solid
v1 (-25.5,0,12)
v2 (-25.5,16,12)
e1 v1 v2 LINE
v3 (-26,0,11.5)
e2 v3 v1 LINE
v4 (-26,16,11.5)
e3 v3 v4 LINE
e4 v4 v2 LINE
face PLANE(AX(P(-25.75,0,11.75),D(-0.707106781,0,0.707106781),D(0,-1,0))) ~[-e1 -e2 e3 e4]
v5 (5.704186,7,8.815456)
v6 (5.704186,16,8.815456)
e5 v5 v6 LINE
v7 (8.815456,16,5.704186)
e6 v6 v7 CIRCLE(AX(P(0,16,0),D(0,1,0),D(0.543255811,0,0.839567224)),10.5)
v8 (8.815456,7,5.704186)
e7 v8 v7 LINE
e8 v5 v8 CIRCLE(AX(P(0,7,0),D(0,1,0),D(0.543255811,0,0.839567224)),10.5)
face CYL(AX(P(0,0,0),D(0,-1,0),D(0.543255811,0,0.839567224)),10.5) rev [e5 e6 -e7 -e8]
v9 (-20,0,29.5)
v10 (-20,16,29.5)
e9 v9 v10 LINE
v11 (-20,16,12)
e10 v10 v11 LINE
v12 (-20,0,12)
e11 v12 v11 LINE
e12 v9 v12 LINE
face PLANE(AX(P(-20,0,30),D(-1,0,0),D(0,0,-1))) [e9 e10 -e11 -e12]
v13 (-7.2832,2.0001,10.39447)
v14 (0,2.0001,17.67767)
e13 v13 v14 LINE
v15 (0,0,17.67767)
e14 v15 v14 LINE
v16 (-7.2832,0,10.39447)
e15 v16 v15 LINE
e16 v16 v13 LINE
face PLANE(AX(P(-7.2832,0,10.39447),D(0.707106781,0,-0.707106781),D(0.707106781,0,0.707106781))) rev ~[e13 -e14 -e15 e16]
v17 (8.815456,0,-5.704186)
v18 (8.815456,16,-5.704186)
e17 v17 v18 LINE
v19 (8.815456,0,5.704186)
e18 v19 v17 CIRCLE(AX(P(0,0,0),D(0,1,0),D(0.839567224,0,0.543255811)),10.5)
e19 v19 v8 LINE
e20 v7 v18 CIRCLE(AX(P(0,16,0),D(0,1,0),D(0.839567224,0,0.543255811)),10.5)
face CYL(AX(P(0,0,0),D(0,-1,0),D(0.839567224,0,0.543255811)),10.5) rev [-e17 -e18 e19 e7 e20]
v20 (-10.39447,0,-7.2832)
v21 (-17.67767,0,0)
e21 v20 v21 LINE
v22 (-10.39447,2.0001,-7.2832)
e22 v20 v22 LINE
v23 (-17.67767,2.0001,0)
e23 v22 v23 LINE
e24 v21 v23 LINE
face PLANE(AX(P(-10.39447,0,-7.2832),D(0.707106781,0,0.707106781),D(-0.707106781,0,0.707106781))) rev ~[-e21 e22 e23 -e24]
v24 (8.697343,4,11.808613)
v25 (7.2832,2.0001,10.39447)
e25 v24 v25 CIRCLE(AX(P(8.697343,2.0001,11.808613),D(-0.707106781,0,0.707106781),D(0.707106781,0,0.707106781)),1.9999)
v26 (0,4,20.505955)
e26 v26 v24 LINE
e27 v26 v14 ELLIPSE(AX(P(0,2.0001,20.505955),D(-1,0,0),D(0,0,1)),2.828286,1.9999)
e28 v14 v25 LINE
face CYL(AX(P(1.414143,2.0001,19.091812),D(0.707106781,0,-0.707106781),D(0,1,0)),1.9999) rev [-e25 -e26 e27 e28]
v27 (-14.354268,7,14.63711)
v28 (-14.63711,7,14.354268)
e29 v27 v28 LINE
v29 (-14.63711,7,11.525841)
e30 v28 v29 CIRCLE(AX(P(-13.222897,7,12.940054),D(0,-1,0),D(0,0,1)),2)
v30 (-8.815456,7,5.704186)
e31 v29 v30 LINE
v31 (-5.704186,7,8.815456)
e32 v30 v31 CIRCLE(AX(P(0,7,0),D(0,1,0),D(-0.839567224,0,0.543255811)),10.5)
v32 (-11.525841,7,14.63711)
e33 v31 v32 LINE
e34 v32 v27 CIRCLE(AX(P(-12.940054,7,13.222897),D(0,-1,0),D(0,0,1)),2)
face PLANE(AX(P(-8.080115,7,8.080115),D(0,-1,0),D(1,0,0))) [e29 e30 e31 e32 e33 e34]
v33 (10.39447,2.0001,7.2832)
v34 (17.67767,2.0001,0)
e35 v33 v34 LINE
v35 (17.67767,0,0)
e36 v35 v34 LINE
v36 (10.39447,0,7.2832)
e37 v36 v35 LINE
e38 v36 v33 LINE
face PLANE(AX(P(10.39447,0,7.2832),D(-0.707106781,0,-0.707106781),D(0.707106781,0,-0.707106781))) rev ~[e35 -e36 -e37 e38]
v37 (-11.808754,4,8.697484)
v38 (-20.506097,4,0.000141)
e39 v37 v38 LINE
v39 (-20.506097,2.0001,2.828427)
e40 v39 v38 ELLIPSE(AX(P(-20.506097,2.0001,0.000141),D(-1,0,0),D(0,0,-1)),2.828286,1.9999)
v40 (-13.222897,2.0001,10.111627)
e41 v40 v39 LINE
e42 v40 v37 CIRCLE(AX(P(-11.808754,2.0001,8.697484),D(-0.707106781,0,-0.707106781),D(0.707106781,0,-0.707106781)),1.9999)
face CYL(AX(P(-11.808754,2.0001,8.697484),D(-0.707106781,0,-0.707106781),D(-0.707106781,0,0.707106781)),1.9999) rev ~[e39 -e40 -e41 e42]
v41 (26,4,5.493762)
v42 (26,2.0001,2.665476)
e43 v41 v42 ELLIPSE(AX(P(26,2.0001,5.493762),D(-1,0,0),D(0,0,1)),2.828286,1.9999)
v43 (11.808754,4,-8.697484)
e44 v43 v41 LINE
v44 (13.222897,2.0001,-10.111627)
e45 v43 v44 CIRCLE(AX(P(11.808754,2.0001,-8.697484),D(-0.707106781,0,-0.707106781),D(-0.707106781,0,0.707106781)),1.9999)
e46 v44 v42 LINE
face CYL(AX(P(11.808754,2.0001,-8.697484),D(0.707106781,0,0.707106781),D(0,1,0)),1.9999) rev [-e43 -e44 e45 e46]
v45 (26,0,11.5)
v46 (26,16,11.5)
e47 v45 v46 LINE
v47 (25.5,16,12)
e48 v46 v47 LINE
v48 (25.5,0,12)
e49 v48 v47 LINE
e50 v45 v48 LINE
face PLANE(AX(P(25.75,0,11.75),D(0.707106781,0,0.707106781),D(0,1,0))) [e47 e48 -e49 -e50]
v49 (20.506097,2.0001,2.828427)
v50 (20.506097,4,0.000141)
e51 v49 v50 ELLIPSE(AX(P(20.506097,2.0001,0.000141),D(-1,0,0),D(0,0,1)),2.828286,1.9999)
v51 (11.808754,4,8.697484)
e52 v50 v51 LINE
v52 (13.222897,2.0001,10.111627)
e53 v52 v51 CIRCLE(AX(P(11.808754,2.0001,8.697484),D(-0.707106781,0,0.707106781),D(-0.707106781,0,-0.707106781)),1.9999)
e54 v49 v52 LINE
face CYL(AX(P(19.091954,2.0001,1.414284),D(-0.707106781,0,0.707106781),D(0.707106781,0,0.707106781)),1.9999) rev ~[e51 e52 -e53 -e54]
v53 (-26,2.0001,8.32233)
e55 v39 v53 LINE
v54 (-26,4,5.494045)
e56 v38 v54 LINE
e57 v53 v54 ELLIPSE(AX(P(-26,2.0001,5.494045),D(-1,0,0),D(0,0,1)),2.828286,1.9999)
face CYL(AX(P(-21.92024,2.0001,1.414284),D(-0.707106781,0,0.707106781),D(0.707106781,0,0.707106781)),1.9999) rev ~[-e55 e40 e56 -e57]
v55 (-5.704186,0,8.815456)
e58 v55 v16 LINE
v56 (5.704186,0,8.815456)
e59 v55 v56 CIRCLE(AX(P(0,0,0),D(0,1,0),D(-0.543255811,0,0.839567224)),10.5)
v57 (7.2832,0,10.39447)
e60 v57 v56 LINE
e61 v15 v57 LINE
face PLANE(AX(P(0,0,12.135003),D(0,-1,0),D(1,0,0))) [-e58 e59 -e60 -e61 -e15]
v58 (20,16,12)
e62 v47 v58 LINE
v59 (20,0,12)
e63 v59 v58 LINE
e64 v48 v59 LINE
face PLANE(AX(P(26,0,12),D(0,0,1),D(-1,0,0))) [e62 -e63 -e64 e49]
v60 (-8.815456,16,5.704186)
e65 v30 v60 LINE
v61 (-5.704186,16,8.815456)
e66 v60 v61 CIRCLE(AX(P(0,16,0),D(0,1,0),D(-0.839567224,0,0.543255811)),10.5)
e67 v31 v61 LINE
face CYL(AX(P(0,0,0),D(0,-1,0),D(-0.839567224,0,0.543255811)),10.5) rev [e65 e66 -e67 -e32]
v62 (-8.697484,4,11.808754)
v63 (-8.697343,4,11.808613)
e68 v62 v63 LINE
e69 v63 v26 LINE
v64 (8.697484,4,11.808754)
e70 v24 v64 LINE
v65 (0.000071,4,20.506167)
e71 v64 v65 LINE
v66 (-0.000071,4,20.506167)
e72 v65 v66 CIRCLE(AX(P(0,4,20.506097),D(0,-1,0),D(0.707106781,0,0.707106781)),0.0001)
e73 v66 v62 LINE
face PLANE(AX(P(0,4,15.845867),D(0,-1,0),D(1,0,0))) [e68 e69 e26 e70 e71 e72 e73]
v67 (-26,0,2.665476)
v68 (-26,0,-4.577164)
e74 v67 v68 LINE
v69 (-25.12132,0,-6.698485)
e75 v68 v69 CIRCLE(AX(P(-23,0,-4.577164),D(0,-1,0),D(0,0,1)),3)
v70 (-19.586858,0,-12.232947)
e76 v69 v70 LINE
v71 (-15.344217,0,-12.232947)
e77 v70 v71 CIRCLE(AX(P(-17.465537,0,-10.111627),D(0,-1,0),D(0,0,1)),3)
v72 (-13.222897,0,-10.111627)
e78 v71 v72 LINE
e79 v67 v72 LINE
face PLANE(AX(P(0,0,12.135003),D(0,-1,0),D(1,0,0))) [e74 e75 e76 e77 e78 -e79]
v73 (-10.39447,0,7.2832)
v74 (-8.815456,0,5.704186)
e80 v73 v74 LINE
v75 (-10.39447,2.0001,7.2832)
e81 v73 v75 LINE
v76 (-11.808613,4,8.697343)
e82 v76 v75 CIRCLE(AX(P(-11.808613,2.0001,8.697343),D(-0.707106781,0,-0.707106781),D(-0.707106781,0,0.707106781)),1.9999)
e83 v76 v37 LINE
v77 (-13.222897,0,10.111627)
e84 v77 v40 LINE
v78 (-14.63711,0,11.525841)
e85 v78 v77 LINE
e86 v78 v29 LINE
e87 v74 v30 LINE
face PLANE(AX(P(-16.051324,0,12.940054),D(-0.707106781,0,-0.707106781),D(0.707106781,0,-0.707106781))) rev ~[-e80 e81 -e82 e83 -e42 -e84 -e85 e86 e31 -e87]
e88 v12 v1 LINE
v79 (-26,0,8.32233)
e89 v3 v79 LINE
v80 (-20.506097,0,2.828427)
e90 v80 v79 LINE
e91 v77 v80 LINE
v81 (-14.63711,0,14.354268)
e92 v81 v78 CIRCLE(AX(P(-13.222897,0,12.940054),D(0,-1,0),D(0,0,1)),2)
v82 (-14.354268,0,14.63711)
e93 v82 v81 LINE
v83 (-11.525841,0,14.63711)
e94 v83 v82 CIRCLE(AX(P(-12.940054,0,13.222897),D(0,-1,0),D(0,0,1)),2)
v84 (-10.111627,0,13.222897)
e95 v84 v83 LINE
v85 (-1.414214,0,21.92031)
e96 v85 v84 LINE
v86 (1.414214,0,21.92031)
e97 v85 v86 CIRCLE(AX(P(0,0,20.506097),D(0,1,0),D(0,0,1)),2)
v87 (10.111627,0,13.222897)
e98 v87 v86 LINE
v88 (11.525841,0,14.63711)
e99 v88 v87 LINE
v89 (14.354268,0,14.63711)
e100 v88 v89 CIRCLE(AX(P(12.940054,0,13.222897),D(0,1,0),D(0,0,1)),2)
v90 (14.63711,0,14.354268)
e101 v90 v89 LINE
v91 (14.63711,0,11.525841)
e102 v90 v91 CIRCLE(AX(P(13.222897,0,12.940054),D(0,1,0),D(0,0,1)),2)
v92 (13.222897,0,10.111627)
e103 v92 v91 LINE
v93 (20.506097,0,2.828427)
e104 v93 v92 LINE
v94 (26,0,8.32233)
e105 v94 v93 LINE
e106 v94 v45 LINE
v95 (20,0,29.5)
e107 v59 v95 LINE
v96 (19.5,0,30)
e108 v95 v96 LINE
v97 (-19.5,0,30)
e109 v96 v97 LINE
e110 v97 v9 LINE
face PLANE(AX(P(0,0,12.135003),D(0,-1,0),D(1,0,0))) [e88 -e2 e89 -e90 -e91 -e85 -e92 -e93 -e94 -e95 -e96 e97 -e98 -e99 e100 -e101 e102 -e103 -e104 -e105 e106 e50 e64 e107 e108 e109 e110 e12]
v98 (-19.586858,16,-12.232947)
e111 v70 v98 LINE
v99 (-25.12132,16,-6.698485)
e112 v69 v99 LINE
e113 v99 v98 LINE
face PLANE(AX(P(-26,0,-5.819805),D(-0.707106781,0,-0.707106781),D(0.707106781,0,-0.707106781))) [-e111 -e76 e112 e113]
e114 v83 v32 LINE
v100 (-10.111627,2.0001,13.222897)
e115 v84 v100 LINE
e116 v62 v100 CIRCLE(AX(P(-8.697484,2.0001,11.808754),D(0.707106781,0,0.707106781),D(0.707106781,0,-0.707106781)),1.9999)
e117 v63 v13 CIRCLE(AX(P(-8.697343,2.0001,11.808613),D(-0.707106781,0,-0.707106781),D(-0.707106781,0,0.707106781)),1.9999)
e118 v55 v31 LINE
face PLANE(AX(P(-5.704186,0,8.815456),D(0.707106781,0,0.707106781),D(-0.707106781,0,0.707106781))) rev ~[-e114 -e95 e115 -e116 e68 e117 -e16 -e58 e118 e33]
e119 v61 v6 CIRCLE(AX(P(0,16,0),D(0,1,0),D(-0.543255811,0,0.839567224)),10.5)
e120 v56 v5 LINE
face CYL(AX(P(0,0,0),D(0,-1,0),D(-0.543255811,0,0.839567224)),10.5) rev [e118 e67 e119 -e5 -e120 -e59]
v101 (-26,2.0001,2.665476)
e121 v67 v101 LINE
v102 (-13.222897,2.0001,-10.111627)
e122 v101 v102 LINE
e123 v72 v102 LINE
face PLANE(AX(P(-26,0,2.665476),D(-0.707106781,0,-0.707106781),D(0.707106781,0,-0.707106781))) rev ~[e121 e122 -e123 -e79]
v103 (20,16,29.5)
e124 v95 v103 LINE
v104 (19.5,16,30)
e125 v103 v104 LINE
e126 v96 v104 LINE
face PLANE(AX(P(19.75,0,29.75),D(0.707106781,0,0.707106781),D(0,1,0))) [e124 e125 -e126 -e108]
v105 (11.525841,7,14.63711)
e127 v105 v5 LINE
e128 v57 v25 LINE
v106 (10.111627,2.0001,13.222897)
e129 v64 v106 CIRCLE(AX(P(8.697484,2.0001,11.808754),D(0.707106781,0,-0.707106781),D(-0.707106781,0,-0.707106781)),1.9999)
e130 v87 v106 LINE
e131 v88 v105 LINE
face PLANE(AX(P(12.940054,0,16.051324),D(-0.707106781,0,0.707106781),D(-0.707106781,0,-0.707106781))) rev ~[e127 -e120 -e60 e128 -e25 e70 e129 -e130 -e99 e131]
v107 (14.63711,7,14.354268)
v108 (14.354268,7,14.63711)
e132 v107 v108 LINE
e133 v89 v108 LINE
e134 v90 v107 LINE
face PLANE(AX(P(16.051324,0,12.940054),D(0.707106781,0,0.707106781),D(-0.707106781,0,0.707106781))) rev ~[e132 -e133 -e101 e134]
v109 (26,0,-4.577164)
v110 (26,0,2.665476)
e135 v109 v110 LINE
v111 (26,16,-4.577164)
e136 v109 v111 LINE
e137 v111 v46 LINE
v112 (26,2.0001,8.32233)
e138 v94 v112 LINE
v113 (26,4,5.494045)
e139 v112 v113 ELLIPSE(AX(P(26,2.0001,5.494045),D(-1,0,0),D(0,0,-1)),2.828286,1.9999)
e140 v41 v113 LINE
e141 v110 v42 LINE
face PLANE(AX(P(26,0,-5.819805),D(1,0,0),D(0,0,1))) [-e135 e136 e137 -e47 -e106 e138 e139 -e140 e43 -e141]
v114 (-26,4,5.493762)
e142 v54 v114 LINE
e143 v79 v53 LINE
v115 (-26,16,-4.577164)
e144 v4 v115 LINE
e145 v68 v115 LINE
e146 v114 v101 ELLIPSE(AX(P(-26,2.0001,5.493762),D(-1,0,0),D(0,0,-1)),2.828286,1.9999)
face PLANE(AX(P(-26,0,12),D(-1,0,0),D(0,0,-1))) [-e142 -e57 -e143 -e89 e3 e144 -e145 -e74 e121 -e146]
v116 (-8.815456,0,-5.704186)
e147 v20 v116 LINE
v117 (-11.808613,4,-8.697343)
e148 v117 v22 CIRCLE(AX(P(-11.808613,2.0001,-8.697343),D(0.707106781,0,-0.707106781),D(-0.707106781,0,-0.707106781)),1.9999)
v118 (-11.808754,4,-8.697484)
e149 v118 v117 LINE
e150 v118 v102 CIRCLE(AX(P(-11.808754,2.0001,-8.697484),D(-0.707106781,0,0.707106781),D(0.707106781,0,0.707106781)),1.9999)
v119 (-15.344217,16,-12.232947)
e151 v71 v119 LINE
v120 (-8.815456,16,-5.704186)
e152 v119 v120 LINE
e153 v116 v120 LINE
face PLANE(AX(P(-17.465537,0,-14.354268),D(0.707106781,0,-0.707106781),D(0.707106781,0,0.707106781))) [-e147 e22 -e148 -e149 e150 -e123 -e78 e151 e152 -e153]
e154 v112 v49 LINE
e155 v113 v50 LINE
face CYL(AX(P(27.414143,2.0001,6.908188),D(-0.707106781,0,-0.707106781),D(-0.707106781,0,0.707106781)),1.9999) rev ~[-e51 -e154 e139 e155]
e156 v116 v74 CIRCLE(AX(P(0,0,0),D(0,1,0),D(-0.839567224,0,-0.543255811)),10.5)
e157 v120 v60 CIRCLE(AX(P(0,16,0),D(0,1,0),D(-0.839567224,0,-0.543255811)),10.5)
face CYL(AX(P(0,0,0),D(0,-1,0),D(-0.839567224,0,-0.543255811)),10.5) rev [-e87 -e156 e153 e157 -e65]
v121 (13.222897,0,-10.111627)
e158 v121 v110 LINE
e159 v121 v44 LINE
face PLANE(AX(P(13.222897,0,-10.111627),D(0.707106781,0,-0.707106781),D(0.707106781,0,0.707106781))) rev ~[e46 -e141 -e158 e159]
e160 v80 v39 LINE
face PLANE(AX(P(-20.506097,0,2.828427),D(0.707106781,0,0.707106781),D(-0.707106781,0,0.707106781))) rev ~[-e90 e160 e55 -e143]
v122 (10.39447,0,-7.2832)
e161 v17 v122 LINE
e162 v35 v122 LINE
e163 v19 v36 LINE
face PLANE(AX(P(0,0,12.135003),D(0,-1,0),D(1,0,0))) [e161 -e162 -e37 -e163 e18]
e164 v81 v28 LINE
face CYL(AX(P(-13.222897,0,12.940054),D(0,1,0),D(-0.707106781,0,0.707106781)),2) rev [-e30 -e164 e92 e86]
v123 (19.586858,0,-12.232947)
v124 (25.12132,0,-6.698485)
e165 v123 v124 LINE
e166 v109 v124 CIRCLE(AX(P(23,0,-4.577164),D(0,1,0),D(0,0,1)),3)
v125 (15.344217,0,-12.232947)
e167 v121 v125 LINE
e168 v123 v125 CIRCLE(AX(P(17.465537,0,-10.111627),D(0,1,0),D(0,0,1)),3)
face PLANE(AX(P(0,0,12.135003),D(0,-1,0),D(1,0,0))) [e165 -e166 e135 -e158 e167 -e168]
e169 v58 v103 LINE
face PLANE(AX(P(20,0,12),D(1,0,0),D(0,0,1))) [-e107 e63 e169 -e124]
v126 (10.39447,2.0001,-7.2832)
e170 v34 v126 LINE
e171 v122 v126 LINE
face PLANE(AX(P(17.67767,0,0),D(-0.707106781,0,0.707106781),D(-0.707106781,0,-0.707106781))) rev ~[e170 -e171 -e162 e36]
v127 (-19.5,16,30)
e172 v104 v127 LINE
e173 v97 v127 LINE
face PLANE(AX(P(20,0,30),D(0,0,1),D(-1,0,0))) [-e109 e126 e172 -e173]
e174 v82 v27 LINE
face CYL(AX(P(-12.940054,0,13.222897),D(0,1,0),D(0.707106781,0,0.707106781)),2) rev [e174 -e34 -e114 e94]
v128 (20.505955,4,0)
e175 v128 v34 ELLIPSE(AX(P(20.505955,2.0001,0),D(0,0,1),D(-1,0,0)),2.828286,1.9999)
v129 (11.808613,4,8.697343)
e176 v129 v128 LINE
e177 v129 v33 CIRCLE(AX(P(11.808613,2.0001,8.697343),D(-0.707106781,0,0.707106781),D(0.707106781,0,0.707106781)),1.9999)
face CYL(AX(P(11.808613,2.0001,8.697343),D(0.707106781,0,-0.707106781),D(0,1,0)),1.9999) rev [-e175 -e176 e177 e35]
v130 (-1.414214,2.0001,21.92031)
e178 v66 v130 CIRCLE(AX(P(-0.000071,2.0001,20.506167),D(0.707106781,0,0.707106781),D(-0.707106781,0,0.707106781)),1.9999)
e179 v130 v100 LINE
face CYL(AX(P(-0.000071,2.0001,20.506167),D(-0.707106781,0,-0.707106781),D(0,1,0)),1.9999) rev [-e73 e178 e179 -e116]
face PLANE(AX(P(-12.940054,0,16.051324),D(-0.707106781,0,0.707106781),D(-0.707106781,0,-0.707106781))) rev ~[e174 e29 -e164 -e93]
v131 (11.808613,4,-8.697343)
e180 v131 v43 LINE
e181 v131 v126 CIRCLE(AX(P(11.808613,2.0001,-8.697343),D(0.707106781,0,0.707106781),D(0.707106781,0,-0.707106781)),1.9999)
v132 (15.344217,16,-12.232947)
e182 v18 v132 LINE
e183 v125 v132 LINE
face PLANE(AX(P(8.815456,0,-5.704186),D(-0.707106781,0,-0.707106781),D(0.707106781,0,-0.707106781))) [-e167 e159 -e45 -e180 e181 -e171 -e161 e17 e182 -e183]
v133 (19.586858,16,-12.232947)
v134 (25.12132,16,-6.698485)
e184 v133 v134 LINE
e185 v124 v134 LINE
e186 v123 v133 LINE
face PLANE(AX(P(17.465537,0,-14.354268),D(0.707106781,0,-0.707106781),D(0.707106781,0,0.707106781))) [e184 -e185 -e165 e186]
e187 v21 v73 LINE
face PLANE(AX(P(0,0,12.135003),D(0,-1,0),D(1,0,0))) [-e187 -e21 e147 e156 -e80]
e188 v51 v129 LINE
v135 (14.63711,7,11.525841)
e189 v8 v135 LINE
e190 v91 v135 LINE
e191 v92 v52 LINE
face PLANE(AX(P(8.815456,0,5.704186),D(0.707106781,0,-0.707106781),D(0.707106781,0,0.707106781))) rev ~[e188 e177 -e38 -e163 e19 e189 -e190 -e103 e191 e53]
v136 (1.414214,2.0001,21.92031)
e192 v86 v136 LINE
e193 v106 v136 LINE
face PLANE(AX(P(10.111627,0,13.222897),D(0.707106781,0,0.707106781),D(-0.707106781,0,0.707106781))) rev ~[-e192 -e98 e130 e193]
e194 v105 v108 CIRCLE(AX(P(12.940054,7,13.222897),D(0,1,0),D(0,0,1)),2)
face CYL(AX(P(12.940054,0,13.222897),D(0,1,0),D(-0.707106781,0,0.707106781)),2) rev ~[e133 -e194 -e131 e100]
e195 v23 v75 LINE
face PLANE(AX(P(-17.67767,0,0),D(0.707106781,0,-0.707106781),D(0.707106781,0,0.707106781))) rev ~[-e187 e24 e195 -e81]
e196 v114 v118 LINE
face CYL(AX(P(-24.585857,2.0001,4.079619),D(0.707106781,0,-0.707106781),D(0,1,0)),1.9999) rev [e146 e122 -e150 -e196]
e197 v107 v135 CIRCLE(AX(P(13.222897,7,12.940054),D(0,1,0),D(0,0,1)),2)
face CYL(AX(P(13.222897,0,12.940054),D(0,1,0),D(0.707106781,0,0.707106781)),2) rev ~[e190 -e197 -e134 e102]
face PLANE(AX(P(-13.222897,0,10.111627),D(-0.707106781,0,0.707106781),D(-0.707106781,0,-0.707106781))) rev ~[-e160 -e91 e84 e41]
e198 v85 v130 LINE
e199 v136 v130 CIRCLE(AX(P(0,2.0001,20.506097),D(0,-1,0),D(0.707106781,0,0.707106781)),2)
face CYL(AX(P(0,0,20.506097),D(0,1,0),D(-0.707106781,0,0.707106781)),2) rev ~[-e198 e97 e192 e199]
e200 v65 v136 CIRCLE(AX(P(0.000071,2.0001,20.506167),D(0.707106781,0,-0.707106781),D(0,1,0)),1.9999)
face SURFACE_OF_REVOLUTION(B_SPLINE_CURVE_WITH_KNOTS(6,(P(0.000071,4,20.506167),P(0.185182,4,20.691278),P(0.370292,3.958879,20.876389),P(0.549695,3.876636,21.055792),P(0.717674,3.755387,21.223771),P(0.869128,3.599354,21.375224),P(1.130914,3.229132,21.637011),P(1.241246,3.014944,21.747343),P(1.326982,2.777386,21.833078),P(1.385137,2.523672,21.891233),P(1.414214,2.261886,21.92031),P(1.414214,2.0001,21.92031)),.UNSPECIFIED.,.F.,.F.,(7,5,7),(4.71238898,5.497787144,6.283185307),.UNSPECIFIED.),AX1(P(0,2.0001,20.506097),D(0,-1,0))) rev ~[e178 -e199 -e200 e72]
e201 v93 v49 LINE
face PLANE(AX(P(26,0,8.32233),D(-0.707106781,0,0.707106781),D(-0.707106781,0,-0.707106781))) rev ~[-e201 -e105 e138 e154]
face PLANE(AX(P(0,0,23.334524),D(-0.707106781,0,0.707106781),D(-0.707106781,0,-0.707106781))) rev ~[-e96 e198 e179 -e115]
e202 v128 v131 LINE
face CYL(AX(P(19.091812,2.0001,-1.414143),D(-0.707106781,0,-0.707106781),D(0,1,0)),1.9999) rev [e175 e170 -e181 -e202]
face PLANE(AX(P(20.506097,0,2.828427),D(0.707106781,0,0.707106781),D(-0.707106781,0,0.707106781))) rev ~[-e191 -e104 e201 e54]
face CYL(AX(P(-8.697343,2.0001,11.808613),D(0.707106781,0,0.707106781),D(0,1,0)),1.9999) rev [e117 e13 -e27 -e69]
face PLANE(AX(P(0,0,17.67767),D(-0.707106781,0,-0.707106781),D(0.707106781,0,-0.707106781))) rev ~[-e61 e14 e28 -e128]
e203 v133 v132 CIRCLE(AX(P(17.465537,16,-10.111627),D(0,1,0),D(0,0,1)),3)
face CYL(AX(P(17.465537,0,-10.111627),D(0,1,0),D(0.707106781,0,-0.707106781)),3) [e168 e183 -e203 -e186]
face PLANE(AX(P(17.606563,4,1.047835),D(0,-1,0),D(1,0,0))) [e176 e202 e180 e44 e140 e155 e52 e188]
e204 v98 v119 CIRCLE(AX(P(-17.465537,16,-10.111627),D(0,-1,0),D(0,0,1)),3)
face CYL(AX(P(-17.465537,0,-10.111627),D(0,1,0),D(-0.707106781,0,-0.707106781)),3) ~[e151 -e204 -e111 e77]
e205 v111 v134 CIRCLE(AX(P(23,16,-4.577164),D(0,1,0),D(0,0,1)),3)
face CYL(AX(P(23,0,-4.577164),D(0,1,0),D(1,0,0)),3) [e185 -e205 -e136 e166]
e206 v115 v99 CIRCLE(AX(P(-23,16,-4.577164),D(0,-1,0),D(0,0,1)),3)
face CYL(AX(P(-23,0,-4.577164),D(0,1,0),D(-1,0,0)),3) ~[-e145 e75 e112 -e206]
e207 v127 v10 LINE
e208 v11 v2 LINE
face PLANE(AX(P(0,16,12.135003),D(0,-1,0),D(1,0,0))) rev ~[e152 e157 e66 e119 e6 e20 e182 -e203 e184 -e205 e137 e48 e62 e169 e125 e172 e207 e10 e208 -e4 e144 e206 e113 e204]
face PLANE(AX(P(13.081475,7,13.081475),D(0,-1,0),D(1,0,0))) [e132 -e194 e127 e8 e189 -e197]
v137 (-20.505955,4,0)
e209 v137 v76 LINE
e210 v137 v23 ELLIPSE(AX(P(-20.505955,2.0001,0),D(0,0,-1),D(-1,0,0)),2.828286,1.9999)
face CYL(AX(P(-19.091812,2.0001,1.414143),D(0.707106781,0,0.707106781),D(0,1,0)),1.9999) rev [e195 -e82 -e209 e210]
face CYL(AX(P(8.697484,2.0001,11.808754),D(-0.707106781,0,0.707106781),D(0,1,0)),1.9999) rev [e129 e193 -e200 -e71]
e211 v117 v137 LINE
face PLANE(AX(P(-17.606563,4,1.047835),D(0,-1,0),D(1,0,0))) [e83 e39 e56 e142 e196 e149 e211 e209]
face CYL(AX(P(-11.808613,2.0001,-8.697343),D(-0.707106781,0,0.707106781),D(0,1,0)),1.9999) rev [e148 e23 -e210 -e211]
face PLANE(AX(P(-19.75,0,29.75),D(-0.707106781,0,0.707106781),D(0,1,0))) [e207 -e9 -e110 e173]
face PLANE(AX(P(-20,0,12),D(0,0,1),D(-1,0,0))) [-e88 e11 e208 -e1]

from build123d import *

# Parameters (mm, degrees)
F1_DEPTH = 16
F2_DEPTH = 7
F3_DEPTH = 4
F4_R     = 2
F5_R     = 1.9999
F6_R     = 3
F7_SIZE  = 0.5


# Not quite as in the source:
# - a fillet or chamfer is up to 0.001 mm smaller than in the source, because OpenCascade refuses the exact size
# - a feature names something its author has since deleted; it is built from what else it names


with BuildPart() as f1:
    # F0 (on Front) → F1 (new body)
    with BuildSketch(Plane.XZ):
        with BuildLine():
            ThreePointArc((-5.7041860158, 8.815455853), (0, 10.5), (5.7041860158, 8.815455853))
            Line((5.7041860158, 8.815455853), (7.2831998462, 10.3944696834))
            Line((7.2831998462, 10.3944696834), (0, 17.6776695297))
            Line((0, 17.6776695297), (-7.2831998462, 10.3944696834))
            Line((-7.2831998462, 10.3944696834), (-5.7041860158, 8.815455853))
        make_face()
        with BuildLine():
            ThreePointArc((-8.815455853, 5.7041860158), (-7.4246212025, 7.4246212025), (-5.7041860158, 8.815455853))
            Line((-5.7041860158, 8.815455853), (-7.2831998462, 10.3944696834))
            Line((-7.2831998462, 10.3944696834), (-10.3944696834, 7.2831998462))
            Line((-10.3944696834, 7.2831998462), (-8.815455853, 5.7041860158))
        make_face()
        with BuildLine():
            ThreePointArc((-8.815455853, -5.7041860158), (-10.5, 0), (-8.815455853, 5.7041860158))
            Line((-8.815455853, 5.7041860158), (-10.3944696834, 7.2831998462))
            Line((-10.3944696834, 7.2831998462), (-17.6776695297, 0))
            Line((-17.6776695297, 0), (-10.3944696834, -7.2831998462))
            Line((-10.3944696834, -7.2831998462), (-8.815455853, -5.7041860158))
        make_face()
        with BuildLine():
            ThreePointArc((5.7041860158, 8.815455853), (7.4246212025, 7.4246212025), (8.815455853, 5.7041860158))
            Line((8.815455853, 5.7041860158), (10.3944696834, 7.2831998462))
            Line((10.3944696834, 7.2831998462), (7.2831998462, 10.3944696834))
            Line((7.2831998462, 10.3944696834), (5.7041860158, 8.815455853))
        make_face()
        Polygon((0, 17.6776695297), (7.2831998462, 10.3944696834), (10.111626971, 13.2228968082), (0, 23.3345237792), (-10.111626971, 13.2228968082), (-7.2831998462, 10.3944696834), align=None)
        Polygon((7.2831998462, 10.3944696834), (10.3944696834, 7.2831998462), (13.2228968082, 10.111626971), (10.111626971, 13.2228968082), align=None)
        Polygon((-10.3944696834, 7.2831998462), (-7.2831998462, 10.3944696834), (-10.111626971, 13.2228968082), (-13.2228968082, 10.111626971), align=None)
        Polygon((-17.6776695297, 0), (-10.3944696834, 7.2831998462), (-13.2228968082, 10.111626971), (-20.5060966544, 2.8284271247), (-26, 8.3223304703), (-26, 2.6654762208), (-13.2228968082, -10.111626971), (-10.3944696834, -7.2831998462), align=None)
        Polygon((-13.2228968082, 10.111626971), (-10.111626971, 13.2228968082), (-12.9400540957, 16.0513239329), (-16.0513239329, 12.9400540957), align=None)
        Polygon((17.6776695297, 0), (10.3944696834, -7.2831998462), (13.2228968082, -10.111626971), (26, 2.6654762208), (26, 8.3223304703), (20.5060966544, 2.8284271247), (13.2228968082, 10.111626971), (10.3944696834, 7.2831998462), align=None)
        with BuildLine():
            ThreePointArc((8.815455853, 5.7041860158), (10.5, 0), (8.815455853, -5.7041860158))
            Line((8.815455853, -5.7041860158), (10.3944696834, -7.2831998462))
            Line((10.3944696834, -7.2831998462), (17.6776695297, 0))
            Line((17.6776695297, 0), (10.3944696834, 7.2831998462))
            Line((10.3944696834, 7.2831998462), (8.815455853, 5.7041860158))
        make_face()
        Polygon((16.0513239329, 12.9400540957), (13.2228968082, 10.111626971), (20.5060966544, 2.8284271247), (26, 8.3223304703), (26, 12), (20, 12), (20, 30), (0, 30), (-20, 30), (-20, 12), (-26, 12), (-26, 8.3223304703), (-20.5060966544, 2.8284271247), (-13.2228968082, 10.111626971), (-16.0513239329, 12.9400540957), (-12.9400540957, 16.0513239329), (-10.111626971, 13.2228968082), (0, 23.3345237792), (10.111626971, 13.2228968082), (12.9400540957, 16.0513239329), align=None)
        Polygon((10.111626971, 13.2228968082), (13.2228968082, 10.111626971), (16.0513239329, 12.9400540957), (12.9400540957, 16.0513239329), align=None)
        Polygon((26, 2.6654762208), (13.2228968082, -10.111626971), (17.4655374953, -14.3542676581), (26, -5.8198051534), align=None)
        Polygon((-17.4655374953, -14.3542676581), (-13.2228968082, -10.111626971), (-26, 2.6654762208), (-26, -5.8198051534), align=None)
    extrude(amount=-F1_DEPTH)

    # F0 (on Front) → F2 (cut)
    with BuildSketch(Plane.XZ):
        Polygon((10.111626971, 13.2228968082), (13.2228968082, 10.111626971), (16.0513239329, 12.9400540957), (12.9400540957, 16.0513239329), align=None)
        Polygon((7.2831998462, 10.3944696834), (10.3944696834, 7.2831998462), (13.2228968082, 10.111626971), (10.111626971, 13.2228968082), align=None)
        with BuildLine():
            ThreePointArc((5.7041860158, 8.815455853), (7.4246212025, 7.4246212025), (8.815455853, 5.7041860158))
            Line((8.815455853, 5.7041860158), (10.3944696834, 7.2831998462))
            Line((10.3944696834, 7.2831998462), (7.2831998462, 10.3944696834))
            Line((7.2831998462, 10.3944696834), (5.7041860158, 8.815455853))
        make_face()
        with BuildLine():
            ThreePointArc((-8.815455853, 5.7041860158), (-7.4246212025, 7.4246212025), (-5.7041860158, 8.815455853))
            Line((-5.7041860158, 8.815455853), (-7.2831998462, 10.3944696834))
            Line((-7.2831998462, 10.3944696834), (-10.3944696834, 7.2831998462))
            Line((-10.3944696834, 7.2831998462), (-8.815455853, 5.7041860158))
        make_face()
        Polygon((-13.2228968082, 10.111626971), (-10.111626971, 13.2228968082), (-12.9400540957, 16.0513239329), (-16.0513239329, 12.9400540957), align=None)
        Polygon((-10.3944696834, 7.2831998462), (-7.2831998462, 10.3944696834), (-10.111626971, 13.2228968082), (-13.2228968082, 10.111626971), align=None)
    extrude(amount=-F2_DEPTH, mode=Mode.SUBTRACT)

    # F0 (on Front) → F3 (cut)
    with BuildSketch(Plane.XZ):
        Polygon((0, 17.6776695297), (7.2831998462, 10.3944696834), (10.111626971, 13.2228968082), (0, 23.3345237792), (-10.111626971, 13.2228968082), (-7.2831998462, 10.3944696834), align=None)
        Polygon((17.6776695297, 0), (10.3944696834, -7.2831998462), (13.2228968082, -10.111626971), (26, 2.6654762208), (26, 8.3223304703), (20.5060966544, 2.8284271247), (13.2228968082, 10.111626971), (10.3944696834, 7.2831998462), align=None)
        Polygon((-17.6776695297, 0), (-10.3944696834, 7.2831998462), (-13.2228968082, 10.111626971), (-20.5060966544, 2.8284271247), (-26, 8.3223304703), (-26, 2.6654762208), (-13.2228968082, -10.111626971), (-10.3944696834, -7.2831998462), align=None)
    extrude(amount=-F3_DEPTH, mode=Mode.SUBTRACT)

    # F4
    f4_edges = [f1.edges().sort_by_distance(p)[0] for p in [
        (-16.051324, 3.5, 12.940054),
        (-12.940054, 3.5, 16.051324),
        (12.940054, 3.5, 16.051324),
        (16.051324, 3.5, 12.940054),
        (0, 2, 23.334524),
    ]]
    fillet(f4_edges, radius=F4_R)

    # F5 (radius 2 in the source; OpenCascade refuses exactly that, so slightly less here)
    f5_edges = [f1.edges().sort_by_distance(p)[0] for p in [
        (19.611448, 4, -3.723075),
        (14.03607, 4, -3.6416),
        (14.03607, 4, 3.6416),
        (16.864497, 4, 6.470027),
        (5.76292, 4, 17.571604),
        (-16.864497, 4, 6.470027),
        (-23.253048, 4, 5.575379),
        (-14.03607, 4, -3.6416),
        (-3.6416, 4, 14.03607),
        (-14.03607, 4, 3.6416),
        (-19.611448, 4, -3.723075),
        (23.253048, 4, 5.575379),
        (0, 4, 22.506097),
        (-5.76292, 4, 17.571604),
        (3.6416, 4, 14.03607),
    ]]
    fillet(f5_edges, radius=F5_R)

    # F6
    f6_edges = [f1.edges().sort_by_distance(p)[0] for p in [
        (17.465537, 8, -14.354268),
        (26, 8, -5.819805),
        (-26, 8, -5.819805),
        (-17.465537, 8, -14.354268),
    ]]
    fillet(f6_edges, radius=F6_R)

    # F7
    f7_edges = [f1.edges().sort_by_distance(p)[0] for p in [
        (20, 8, 30),
        (26, 8, 12),
        (-20, 8, 30),
        (-26, 8, 12),
    ]]
    chamfer(f7_edges, length=F7_SIZE)


solid = f1.part
